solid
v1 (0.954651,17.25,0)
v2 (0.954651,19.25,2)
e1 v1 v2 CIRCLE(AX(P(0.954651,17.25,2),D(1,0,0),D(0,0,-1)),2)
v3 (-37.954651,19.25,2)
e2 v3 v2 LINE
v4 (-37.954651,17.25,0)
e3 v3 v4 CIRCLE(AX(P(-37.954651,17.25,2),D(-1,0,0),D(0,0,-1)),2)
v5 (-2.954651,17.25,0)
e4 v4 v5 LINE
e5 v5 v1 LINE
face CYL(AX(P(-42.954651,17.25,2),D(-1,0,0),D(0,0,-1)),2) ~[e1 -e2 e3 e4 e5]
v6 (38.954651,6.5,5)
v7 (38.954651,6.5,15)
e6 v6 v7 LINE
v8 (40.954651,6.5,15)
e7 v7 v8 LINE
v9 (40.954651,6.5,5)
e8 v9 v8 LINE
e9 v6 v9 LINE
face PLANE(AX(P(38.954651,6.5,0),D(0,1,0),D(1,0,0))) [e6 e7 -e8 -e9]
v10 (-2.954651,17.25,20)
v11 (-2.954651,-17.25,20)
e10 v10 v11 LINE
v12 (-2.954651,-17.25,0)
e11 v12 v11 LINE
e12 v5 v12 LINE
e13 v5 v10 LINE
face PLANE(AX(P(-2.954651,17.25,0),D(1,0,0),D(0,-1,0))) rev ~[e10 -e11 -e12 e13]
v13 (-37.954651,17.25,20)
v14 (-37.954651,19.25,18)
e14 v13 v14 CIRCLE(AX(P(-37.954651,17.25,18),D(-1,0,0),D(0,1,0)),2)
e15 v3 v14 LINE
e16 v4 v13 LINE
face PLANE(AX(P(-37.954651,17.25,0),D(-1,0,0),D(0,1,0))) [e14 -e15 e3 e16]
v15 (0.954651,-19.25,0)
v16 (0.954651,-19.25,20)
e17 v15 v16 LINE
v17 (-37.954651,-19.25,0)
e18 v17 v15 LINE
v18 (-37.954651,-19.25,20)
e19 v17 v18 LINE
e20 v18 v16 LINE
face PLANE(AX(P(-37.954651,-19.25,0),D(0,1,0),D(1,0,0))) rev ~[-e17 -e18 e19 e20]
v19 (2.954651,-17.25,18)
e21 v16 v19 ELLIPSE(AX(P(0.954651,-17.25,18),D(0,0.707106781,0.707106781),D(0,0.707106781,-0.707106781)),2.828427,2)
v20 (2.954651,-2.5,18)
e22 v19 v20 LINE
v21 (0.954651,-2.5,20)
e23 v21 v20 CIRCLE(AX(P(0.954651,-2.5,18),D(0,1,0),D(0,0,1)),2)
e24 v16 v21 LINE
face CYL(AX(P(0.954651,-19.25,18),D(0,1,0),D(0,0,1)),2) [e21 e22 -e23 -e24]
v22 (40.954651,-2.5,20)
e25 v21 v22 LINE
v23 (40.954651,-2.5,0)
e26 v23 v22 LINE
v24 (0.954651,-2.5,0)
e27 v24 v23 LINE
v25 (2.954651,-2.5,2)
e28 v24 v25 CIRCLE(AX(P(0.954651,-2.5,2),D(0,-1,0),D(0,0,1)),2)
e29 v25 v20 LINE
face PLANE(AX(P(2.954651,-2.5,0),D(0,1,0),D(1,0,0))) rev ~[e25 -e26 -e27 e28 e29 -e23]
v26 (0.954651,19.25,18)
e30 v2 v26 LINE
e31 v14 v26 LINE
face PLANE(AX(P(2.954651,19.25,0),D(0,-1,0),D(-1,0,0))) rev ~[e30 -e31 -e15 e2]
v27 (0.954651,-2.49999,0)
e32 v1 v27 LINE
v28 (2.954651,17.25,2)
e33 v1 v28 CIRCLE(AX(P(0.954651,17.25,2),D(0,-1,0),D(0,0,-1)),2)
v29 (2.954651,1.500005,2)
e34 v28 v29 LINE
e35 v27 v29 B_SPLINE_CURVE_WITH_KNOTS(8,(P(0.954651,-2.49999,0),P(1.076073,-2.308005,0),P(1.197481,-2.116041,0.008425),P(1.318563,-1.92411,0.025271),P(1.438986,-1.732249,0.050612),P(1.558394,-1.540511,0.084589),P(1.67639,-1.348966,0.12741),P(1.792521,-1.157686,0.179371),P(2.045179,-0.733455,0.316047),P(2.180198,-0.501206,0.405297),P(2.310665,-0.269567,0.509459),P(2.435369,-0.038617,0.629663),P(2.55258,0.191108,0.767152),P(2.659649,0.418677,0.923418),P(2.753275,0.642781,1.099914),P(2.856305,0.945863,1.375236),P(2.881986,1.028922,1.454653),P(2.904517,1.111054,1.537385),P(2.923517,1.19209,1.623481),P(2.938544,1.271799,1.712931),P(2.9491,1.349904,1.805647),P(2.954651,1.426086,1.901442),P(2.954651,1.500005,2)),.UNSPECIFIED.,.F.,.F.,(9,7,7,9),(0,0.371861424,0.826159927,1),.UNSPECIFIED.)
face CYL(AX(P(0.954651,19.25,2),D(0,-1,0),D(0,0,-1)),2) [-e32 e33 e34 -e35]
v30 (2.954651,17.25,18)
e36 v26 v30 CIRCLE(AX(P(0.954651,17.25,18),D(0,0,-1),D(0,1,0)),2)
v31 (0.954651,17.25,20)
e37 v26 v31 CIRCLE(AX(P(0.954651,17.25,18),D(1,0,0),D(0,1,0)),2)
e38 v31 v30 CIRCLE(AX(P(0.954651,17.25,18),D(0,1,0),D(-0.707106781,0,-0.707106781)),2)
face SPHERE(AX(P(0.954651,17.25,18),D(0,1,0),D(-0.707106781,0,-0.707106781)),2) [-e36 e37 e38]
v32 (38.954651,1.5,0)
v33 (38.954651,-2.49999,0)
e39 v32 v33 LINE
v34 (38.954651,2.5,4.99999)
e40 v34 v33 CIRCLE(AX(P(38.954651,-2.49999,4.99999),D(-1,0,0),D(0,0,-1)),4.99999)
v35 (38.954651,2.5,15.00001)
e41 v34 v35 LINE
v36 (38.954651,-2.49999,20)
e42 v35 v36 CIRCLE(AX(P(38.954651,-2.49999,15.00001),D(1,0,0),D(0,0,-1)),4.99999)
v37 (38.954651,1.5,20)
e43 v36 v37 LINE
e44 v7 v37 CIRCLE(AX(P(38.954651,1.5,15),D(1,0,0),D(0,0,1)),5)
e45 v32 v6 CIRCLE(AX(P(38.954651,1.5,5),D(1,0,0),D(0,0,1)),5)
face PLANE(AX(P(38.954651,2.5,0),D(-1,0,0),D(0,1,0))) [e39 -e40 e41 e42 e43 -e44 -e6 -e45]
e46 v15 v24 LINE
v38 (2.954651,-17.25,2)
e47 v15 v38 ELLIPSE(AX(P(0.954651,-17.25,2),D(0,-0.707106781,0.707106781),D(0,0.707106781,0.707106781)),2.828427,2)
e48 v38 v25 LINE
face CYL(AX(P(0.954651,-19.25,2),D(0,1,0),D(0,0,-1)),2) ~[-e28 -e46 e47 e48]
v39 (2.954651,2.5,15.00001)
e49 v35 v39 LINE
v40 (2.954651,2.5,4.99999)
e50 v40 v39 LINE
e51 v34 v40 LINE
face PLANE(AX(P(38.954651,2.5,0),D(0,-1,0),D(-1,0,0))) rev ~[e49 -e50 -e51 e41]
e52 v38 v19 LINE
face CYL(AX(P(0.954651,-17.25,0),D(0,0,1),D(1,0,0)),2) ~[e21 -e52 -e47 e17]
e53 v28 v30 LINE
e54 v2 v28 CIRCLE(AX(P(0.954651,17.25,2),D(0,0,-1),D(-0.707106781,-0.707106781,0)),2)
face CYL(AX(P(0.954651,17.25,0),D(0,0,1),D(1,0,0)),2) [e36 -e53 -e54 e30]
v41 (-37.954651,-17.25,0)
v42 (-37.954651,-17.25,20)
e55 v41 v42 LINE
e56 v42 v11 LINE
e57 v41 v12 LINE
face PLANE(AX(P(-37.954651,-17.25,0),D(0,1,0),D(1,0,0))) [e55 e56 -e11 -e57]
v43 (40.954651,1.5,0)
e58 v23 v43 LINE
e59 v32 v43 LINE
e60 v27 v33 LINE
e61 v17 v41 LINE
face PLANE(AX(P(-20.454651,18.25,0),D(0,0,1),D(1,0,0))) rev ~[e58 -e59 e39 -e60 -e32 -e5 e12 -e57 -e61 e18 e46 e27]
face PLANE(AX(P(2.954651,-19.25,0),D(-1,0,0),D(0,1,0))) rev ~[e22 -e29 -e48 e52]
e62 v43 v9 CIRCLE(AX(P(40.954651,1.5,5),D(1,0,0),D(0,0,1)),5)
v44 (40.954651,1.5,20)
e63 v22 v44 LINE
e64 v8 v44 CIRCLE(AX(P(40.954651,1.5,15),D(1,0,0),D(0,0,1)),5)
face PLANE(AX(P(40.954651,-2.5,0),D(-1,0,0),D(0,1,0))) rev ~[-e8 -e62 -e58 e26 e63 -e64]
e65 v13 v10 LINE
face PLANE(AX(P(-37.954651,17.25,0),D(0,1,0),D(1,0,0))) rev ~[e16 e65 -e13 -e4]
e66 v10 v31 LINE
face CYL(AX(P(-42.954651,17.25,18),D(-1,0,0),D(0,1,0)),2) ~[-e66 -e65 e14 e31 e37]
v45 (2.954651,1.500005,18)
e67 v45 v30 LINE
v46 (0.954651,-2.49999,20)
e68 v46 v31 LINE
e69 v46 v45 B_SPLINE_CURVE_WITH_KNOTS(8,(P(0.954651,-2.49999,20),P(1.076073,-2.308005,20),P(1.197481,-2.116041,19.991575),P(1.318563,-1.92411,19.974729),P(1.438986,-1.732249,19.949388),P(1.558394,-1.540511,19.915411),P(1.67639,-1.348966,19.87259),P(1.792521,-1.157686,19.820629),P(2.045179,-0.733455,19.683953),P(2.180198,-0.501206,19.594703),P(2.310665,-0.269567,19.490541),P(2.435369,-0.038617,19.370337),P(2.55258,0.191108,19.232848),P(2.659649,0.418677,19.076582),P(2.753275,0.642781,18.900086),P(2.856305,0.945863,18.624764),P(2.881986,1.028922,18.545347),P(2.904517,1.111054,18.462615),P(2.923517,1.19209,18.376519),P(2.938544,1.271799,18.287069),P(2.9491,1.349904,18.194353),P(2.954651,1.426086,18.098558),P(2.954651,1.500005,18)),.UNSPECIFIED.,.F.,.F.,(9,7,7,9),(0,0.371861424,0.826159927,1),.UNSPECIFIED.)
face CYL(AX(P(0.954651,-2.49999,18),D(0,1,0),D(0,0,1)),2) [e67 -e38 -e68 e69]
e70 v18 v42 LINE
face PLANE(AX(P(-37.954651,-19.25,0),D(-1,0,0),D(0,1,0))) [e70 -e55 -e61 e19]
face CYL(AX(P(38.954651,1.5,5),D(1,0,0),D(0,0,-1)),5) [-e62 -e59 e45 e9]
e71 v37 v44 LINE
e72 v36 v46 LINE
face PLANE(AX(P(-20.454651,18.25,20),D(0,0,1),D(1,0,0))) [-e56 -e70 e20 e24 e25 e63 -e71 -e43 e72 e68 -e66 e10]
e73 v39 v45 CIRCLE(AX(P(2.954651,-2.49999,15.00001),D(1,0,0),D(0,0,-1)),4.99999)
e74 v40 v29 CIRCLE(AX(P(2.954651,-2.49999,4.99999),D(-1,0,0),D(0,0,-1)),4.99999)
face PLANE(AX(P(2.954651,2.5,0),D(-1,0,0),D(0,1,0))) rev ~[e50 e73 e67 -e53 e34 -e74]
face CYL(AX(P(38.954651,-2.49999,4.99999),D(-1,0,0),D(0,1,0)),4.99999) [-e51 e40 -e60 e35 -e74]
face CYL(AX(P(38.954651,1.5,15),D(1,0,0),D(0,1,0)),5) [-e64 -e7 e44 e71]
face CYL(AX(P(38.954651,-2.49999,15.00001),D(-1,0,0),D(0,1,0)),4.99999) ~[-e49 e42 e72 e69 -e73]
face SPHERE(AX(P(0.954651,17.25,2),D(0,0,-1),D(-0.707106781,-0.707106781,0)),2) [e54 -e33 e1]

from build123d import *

# Parameters (mm, degrees)
F0_W         = 35
F0_H         = 2
F0_W_2       = 2
F0_H_2       = 4
F1_DEPTH     = 20
F2_R         = 4.99999
F3_R         = 5
F4_R         = 2
F5_T1_DEPTH  = 43.9093010689
F5_S5_W      = 2
F5_S5_H      = 2
F5_T6_DEPTH  = 2
F5_S11_W     = 2
F5_S11_H     = 2
F5_T12_DEPTH = 2


# Not quite as in the source:
# - a fillet or chamfer that OpenCascade refuses, or shapes differently, is made with other operations: its cross-section is extruded or revolved along the edge and cut away or added
# - a fillet or chamfer is up to 0.001 mm smaller than in the source, because OpenCascade refuses the exact size


with BuildPart() as f1:
    # F0 (on Top) → F1 (new body)
    with BuildSketch(Plane.XY):
        with Locations((-20.4546505344, 18.25)):
            Rectangle(F0_W, F0_H)
        Polygon((2.9546505344, 2.5), (2.9546505344, 19.25), (-2.9546505344, 19.25), (-2.9546505344, 17.25), (-2.9546505344, -17.25), (-2.9546505344, -19.25), (2.9546505344, -19.25), (2.9546505344, -2.5), align=None)
        Polygon((38.9546505344, 2.5), (2.9546505344, 2.5), (2.9546505344, -2.5), (40.9546505344, -2.5), (40.9546505344, 2.5), align=None)
        with Locations((39.9546505344, 4.5)):
            Rectangle(F0_W_2, F0_H_2)
        with Locations((-20.4546505344, -18.25)):
            Rectangle(F0_W, F0_H)
    extrude(amount=F1_DEPTH)

    # F2 (radius 5 in the source; OpenCascade refuses exactly that, so slightly less here)
    f2_edges = [f1.edges().sort_by_distance(p)[0] for p in [
        (20.954651, 2.5, 20),
        (20.954651, 2.5, 0),
    ]]
    fillet(f2_edges, radius=F2_R)

    # F3
    f3_edges = [f1.edges().sort_by_distance(p)[0] for p in [
        (39.954651, 6.5, 20),
        (39.954651, 6.5, 0),
    ]]
    fillet(f3_edges, radius=F3_R)

    # F4
    f4_edges = [f1.edges().sort_by_distance(p)[0] for p in [
        (2.954651, 10.875, 20),
        (2.954651, -10.875, 20),
        (2.954651, 10.875, 0),
        (2.954651, -10.875, 0),
        (2.954651, 19.25, 10),
        (2.954651, -19.25, 10),
    ]]
    fillet(f4_edges, radius=F4_R)

    # F5: fillet of radius 2 on 2 edges, made by hand

    # F5_s2 → F5_t1 (cut)
    with BuildSketch(Plane.YZ.offset(-42.9546505344)):
        with BuildLine():
            ThreePointArc((17.25, 0), (18.6642135624, 0.5857864376), (19.25, 2))
            Line((19.25, 2), (19.25, 0))
            Line((19.25, 0), (17.25, 0))
        make_face()
        with BuildLine():
            ThreePointArc((19.25, 18), (18.6642135624, 19.4142135624), (17.25, 20))
            Line((17.25, 20), (19.25, 20))
            Line((19.25, 20), (19.25, 18))
        make_face()
    extrude(amount=F5_T1_DEPTH, mode=Mode.SUBTRACT)


with BuildPart() as f5_tool4:
    # F5_s5 → F5_t6 (new body)
    with BuildSketch(Plane.XZ.offset(-17.25)):
        with Locations((1.9546505344, 19)):
            Rectangle(F5_S5_W, F5_S5_H)
    extrude(amount=-F5_T6_DEPTH)

    # F5_s7 → F5_t8 (revolve, cut)
    with BuildSketch(Plane(origin=(0.9546505344, 17.25, 18), x_dir=(-0.7071067812, 0, -0.7071067812), z_dir=(0.7071067812, 0, -0.7071067812))):
        with BuildLine():
            ThreePointArc((0, -2), (2, 0), (0, 2))
            Line((0, 2), (0, -2))
        make_face()
    revolve(axis=Axis((0.9546505344, 17.25, 18), (0, 1, 0)), mode=Mode.SUBTRACT)


with BuildPart() as f1_1:
    add(f1.part)

    # F5_t3: cut F5_tool4
    add(f5_tool4.part, mode=Mode.SUBTRACT)


with BuildPart() as f5_tool10:
    # F5_s11 → F5_t12 (new body)
    with BuildSketch(Plane.XY.offset(2)):
        with Locations((1.9546505344, 18.25)):
            Rectangle(F5_S11_W, F5_S11_H)
    extrude(amount=-F5_T12_DEPTH)

    # F5_s13 → F5_t14 (revolve, cut)
    with BuildSketch(Plane(origin=(0.9546505344, 17.25, 2), x_dir=(-0.7071067812, -0.7071067812, 0), z_dir=(0.7071067812, -0.7071067812, 0))):
        with BuildLine():
            ThreePointArc((0, -2), (2, 0), (0, 2))
            Line((0, 2), (0, -2))
        make_face()
    revolve(axis=Axis((0.9546505344, 17.25, 2), (0, 0, -1)), mode=Mode.SUBTRACT)


with BuildPart() as f1_2:
    add(f1_1.part)

    # F5_t9: cut F5_tool10
    add(f5_tool10.part, mode=Mode.SUBTRACT)


solid = f1_2.part
